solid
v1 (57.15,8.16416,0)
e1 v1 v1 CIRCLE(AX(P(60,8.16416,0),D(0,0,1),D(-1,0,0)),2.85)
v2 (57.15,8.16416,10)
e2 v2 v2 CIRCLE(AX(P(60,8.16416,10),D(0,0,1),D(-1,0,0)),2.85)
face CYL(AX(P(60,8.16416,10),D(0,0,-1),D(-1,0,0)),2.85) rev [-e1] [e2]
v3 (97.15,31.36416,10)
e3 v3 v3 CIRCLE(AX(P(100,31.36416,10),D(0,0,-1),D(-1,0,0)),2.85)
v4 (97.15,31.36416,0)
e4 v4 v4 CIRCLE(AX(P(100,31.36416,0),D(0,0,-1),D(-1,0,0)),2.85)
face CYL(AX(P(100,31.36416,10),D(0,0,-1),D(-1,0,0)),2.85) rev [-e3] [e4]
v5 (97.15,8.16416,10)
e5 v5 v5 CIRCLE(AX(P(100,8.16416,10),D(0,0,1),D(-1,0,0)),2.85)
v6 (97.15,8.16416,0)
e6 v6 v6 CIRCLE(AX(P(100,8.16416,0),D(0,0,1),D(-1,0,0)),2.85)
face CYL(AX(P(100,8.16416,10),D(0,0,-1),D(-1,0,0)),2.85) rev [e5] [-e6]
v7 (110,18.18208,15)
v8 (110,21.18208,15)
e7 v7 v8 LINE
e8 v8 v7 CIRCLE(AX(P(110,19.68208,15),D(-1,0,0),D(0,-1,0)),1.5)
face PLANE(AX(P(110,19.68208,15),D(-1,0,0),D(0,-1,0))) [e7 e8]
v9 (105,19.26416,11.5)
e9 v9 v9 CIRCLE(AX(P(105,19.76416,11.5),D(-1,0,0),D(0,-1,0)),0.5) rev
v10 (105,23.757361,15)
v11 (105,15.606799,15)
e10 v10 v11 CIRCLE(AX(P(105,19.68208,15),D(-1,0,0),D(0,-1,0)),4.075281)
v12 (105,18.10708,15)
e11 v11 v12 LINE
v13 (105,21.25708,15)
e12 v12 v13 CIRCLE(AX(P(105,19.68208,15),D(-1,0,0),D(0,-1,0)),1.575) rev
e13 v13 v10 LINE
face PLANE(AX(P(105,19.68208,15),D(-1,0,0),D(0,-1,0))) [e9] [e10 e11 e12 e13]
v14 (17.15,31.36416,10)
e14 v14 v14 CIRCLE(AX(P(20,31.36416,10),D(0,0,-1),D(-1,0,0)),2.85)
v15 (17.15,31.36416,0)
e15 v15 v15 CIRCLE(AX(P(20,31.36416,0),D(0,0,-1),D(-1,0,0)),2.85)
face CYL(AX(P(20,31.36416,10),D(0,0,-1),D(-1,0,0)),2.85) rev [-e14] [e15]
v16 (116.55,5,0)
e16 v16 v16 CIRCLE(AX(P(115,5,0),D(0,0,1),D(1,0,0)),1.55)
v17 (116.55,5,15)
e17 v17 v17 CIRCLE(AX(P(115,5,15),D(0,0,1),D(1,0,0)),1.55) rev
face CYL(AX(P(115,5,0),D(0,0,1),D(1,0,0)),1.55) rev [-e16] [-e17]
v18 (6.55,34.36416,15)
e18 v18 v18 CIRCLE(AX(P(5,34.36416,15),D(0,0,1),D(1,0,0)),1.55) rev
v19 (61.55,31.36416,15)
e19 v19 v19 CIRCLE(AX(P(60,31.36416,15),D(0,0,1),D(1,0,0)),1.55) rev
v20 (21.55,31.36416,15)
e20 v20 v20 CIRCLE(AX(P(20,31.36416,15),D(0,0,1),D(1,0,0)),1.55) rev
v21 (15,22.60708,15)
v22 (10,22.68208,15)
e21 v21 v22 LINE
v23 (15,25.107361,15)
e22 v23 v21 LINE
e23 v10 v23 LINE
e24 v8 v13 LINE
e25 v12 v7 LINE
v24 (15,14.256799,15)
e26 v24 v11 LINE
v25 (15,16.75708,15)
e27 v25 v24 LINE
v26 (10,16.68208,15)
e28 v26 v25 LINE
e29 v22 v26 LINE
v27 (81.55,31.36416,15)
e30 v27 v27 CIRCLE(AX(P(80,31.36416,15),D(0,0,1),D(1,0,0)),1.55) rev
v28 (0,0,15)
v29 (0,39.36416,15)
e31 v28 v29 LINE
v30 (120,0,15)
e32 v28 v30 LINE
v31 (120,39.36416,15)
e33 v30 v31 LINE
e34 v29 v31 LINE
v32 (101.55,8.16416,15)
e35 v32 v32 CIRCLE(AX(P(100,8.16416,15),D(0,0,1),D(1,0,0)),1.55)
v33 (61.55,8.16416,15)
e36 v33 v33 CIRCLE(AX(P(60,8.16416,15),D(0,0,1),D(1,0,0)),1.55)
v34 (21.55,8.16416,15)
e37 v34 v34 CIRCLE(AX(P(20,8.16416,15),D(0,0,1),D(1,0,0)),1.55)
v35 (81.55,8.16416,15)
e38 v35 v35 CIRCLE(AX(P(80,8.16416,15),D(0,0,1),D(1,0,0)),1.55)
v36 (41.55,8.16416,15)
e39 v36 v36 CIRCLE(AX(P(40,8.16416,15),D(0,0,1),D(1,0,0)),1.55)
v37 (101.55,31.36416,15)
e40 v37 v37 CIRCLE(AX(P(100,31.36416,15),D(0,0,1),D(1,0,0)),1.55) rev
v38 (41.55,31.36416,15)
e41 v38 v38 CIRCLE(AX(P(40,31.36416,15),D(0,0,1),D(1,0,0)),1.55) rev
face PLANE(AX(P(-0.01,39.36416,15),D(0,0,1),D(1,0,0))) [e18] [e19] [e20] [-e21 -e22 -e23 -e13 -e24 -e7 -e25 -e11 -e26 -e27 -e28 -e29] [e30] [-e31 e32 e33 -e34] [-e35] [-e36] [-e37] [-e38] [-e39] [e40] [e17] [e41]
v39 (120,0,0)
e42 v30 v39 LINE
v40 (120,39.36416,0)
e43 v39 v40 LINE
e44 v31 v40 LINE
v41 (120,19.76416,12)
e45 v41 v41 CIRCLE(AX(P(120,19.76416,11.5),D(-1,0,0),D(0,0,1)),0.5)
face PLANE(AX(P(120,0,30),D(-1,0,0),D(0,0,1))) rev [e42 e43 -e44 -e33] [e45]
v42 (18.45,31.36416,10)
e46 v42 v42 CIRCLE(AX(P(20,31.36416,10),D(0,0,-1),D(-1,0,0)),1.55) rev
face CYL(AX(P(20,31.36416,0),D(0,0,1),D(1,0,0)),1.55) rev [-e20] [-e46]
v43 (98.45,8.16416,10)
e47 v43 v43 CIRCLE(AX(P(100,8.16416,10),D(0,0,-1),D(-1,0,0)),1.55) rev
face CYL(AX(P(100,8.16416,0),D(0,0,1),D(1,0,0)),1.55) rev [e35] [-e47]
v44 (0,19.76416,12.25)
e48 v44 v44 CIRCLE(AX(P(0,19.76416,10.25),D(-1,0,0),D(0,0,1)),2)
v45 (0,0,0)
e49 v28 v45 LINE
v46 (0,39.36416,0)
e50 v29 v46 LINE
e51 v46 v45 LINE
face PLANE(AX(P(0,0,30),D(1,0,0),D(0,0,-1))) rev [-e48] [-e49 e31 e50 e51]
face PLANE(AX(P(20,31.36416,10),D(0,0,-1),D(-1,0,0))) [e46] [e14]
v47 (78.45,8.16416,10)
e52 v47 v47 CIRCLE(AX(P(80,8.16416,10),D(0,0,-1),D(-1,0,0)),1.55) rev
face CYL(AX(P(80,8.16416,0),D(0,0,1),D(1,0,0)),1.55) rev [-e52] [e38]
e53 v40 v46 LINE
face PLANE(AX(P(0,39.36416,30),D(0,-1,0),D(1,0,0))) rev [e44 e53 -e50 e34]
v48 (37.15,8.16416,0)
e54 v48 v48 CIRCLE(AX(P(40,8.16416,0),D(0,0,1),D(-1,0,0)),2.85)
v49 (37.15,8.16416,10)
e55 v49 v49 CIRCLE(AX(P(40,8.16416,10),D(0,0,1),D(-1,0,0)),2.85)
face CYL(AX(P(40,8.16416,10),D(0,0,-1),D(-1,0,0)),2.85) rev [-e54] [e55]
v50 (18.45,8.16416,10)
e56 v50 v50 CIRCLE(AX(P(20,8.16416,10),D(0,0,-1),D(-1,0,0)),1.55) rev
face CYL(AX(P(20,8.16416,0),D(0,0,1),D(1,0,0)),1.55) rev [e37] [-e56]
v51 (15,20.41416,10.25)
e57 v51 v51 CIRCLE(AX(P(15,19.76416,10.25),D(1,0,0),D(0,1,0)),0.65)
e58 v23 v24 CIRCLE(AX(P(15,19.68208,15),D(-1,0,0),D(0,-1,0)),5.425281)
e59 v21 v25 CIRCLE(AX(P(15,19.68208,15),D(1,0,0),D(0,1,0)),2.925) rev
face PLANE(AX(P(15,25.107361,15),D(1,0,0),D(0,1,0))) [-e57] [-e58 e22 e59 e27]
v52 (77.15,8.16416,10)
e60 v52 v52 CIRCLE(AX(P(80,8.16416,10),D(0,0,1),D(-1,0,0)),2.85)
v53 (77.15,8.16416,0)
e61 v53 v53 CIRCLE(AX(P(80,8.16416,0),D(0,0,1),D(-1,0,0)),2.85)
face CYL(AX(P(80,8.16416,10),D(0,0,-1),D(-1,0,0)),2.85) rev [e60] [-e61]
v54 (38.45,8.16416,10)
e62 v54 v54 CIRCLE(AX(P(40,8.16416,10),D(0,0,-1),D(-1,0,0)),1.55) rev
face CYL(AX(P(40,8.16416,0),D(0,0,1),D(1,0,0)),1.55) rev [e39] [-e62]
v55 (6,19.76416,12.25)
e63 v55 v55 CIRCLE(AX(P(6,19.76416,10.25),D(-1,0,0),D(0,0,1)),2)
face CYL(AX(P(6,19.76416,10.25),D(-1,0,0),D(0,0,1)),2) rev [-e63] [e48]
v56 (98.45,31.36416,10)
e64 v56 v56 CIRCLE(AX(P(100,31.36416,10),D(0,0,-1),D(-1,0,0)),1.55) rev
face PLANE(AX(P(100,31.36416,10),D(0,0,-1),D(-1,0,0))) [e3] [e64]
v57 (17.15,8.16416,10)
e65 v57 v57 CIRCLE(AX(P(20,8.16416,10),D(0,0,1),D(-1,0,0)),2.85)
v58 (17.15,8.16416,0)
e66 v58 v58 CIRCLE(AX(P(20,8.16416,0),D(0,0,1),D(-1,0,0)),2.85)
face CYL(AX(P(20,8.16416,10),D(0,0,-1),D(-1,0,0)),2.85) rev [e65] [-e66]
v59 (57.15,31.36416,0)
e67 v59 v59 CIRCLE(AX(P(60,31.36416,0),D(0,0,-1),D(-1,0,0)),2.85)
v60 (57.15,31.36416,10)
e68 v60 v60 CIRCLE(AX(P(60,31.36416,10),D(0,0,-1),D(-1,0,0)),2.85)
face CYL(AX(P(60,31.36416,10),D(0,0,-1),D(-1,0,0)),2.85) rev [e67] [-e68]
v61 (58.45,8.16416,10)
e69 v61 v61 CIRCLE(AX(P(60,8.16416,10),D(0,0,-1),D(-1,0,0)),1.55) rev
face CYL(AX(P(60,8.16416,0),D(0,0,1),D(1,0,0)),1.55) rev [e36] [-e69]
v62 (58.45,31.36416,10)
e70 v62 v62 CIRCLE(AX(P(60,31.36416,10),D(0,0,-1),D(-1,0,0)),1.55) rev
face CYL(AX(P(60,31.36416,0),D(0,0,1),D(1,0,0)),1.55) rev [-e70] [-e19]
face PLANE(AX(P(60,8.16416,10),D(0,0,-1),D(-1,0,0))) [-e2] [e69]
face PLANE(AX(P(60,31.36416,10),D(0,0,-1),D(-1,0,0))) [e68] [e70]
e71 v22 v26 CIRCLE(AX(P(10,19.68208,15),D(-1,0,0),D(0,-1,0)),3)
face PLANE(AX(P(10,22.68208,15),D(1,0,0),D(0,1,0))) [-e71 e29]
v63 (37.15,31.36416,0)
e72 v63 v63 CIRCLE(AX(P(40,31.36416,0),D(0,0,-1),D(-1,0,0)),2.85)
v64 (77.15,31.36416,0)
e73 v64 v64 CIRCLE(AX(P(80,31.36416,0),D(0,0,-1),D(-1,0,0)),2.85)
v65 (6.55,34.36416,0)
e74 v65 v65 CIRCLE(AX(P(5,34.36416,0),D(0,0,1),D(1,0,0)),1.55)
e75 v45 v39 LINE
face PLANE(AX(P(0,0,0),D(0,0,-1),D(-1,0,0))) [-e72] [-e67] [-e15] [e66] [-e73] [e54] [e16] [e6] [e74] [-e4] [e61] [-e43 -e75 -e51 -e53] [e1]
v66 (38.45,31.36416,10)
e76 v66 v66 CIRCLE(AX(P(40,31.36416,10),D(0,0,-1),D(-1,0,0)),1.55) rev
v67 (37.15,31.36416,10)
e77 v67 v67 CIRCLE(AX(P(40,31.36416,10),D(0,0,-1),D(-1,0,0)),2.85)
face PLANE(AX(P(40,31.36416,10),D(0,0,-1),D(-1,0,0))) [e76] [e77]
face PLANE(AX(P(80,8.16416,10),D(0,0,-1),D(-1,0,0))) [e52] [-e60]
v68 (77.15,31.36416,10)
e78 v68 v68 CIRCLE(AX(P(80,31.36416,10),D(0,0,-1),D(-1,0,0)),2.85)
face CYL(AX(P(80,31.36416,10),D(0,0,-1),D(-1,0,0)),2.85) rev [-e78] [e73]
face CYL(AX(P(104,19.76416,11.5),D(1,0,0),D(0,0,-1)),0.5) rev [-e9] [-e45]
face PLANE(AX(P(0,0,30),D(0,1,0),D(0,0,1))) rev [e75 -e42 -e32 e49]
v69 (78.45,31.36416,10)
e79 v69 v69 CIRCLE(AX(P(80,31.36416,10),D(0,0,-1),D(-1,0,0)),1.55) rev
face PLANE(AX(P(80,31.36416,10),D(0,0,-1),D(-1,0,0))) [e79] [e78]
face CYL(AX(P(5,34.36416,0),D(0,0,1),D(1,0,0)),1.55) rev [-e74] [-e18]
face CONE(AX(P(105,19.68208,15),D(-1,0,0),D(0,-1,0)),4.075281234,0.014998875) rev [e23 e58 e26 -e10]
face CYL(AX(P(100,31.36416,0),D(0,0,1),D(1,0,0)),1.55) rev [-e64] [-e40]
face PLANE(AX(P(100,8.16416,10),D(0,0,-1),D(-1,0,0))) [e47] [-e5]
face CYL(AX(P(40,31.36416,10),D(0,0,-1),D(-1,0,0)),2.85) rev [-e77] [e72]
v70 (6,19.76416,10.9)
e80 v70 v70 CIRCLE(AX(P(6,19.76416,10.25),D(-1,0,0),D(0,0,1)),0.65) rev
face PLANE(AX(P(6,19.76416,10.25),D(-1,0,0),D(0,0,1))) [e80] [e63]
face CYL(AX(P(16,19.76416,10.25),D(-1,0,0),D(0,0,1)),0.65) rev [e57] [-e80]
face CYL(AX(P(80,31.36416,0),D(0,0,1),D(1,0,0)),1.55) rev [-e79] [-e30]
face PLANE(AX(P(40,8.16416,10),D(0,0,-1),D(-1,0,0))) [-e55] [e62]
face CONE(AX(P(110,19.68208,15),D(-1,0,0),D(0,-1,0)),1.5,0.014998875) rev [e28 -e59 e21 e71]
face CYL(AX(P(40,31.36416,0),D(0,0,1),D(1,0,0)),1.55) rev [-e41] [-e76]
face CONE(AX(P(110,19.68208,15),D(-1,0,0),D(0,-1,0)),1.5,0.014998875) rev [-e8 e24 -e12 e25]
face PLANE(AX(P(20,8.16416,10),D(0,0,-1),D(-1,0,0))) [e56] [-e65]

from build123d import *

# Parameters (mm, degrees)
SKIZZE2_W                        = 120
SKIZZE2_H                        = 39.364160046
AUFSATZ_LINEAR_AUSTRAGEN1_DEPTH  = 30
SKIZZE24_R                       = 1.55
SCHNITT_LINEAR_AUSTRAGEN4_DEPTH  = 130.805766806
SKIZZE46_R                       = 2.85
SCHNITT_LINEAR_AUSTRAGEN15_DEPTH = 10
SCHNITT_LINEAR_START             = -5
SCHNITT_LINEAR_AUSTRAGEN25_DEPTH = 2.7
LINEARES_MUSTER1_COUNT           = 5
LINEARES_MUSTER1_PITCH           = 20
SPIEGELN2_COPY_1_SKETCH_R        = 2.85
SPIEGELN2_COPY_1_DEPTH           = 10
SPIEGELN2_COPY_2_SKETCH_R        = 2.85
SPIEGELN2_COPY_2_DEPTH           = 10
SPIEGELN2_COPY_3_SKETCH_R        = 2.85
SPIEGELN2_COPY_3_DEPTH           = 10
SPIEGELN2_COPY_4_SKETCH_R        = 2.85
SPIEGELN2_COPY_4_DEPTH           = 10
SPIEGELN2_START                  = -5
SPIEGELN2_COPY_5_DEPTH           = 2.7
SPIEGELN2_COPY_6_DEPTH           = 2.7
SPIEGELN2_COPY_7_DEPTH           = 2.7
SPIEGELN2_COPY_8_DEPTH           = 2.7
SKIZZE51_R                       = 1.55
SCHNITT_LINEAR_AUSTRAGEN26_DEPTH = 130.805766806
SKIZZE67_R                       = 0.5
SCHNITT_LINEAR_AUSTRAGEN28_DEPTH = 16
SKIZZE68_R                       = 0.65
SCHNITT_LINEAR_AUSTRAGEN30_DEPTH = 16
SKIZZE70_R                       = 2
SCHNITT_LINEAR_AUSTRAGEN31_DEPTH = 6
ABSPALTEN3_START                 = 15
ABSPALTEN3_OUTLINE_W             = 120
ABSPALTEN3_OUTLINE_H             = 39.364160046
ABSPALTEN3_OUTLINE_R             = 1.55
ABSPALTEN3_DEPTH                 = 15


# Read off the part's stored shape, not the designer's step: Abspalten3
with BuildPart() as part:
    # Skizze2 → Aufsatz-Linear austragen1 (new body)
    with BuildSketch(Plane.XY):
        with Locations((60, 19.682080023)):
            Rectangle(SKIZZE2_W, SKIZZE2_H)
    extrude(amount=AUFSATZ_LINEAR_AUSTRAGEN1_DEPTH)

    # Skizze24 → Schnitt-Linear austragen4 (cut, through all)
    with BuildSketch(Plane.XY.offset(30)):
        with Locations((20, 31.364160046)):
            Circle(SKIZZE24_R)
        with Locations((40, 31.364160046)):
            Circle(SKIZZE24_R)
        with Locations((60, 31.364160046)):
            Circle(SKIZZE24_R)
        with Locations((80, 31.364160046)):
            Circle(SKIZZE24_R)
        with Locations((100, 31.364160046)):
            Circle(SKIZZE24_R)
    schnitt_linear_austragen4 = extrude(amount=-SCHNITT_LINEAR_AUSTRAGEN4_DEPTH, mode=Mode.SUBTRACT)

    # Skizze46 → Schnitt-Linear austragen15 (cut)
    with BuildSketch(Plane(origin=(0, 0, 0), x_dir=(-1, 0, 0), z_dir=(0, 0, -1))):
        with Locations((-100, 31.364160046)):
            Circle(SKIZZE46_R)
    schnitt_linear_austragen15 = extrude(amount=-SCHNITT_LINEAR_AUSTRAGEN15_DEPTH, mode=Mode.SUBTRACT)

    # Skizze50 → Schnitt-Linear austragen25 (cut)
    with BuildSketch(Plane.XY.offset(30).offset(SCHNITT_LINEAR_START)):
        Polygon((97.15, 33.009608314), (97.15, 39.364160046), (102.85, 39.364160046), (102.85, 33.009608314), (102.85, 29.718711779), (100, 28.073263512), (97.15, 29.718711779), align=None)
    schnitt_linear_austragen25 = extrude(amount=-SCHNITT_LINEAR_AUSTRAGEN25_DEPTH, mode=Mode.SUBTRACT)

    # Lineares Muster1: Schnitt-Linear austragen15, Schnitt-Linear austragen25 ×5
    with Locations(*[(-i * LINEARES_MUSTER1_PITCH, 0, 0) for i in range(1, LINEARES_MUSTER1_COUNT)]):
        add(schnitt_linear_austragen15, mode=Mode.SUBTRACT)
        add(schnitt_linear_austragen25, mode=Mode.SUBTRACT)

    # Spiegeln2: Schnitt-Linear austragen15, Schnitt-Linear austragen25 across plane
    add(schnitt_linear_austragen15.mirror(Plane.ZX.offset(19.764160046)), mode=Mode.SUBTRACT)
    add(schnitt_linear_austragen25.mirror(Plane.ZX.offset(19.764160046)), mode=Mode.SUBTRACT)

    # Spiegeln2 copy 1 sketch → Spiegeln2 copy 1 (cut)
    with BuildSketch(Plane(origin=(-20, 39.528320093, 0), x_dir=(-1, 0, 0), z_dir=(0, 0, -1))):
        with Locations((-100, -31.364160046)):
            Circle(SPIEGELN2_COPY_1_SKETCH_R)
    extrude(amount=-SPIEGELN2_COPY_1_DEPTH, mode=Mode.SUBTRACT)

    # Spiegeln2 copy 2 sketch → Spiegeln2 copy 2 (cut)
    with BuildSketch(Plane(origin=(-40, 39.528320093, 0), x_dir=(-1, 0, 0), z_dir=(0, 0, -1))):
        with Locations((-100, -31.364160046)):
            Circle(SPIEGELN2_COPY_2_SKETCH_R)
    extrude(amount=-SPIEGELN2_COPY_2_DEPTH, mode=Mode.SUBTRACT)

    # Spiegeln2 copy 3 sketch → Spiegeln2 copy 3 (cut)
    with BuildSketch(Plane(origin=(-60, 39.528320093, 0), x_dir=(-1, 0, 0), z_dir=(0, 0, -1))):
        with Locations((-100, -31.364160046)):
            Circle(SPIEGELN2_COPY_3_SKETCH_R)
    extrude(amount=-SPIEGELN2_COPY_3_DEPTH, mode=Mode.SUBTRACT)

    # Spiegeln2 copy 4 sketch → Spiegeln2 copy 4 (cut)
    with BuildSketch(Plane(origin=(-80, 39.528320093, 0), x_dir=(-1, 0, 0), z_dir=(0, 0, -1))):
        with Locations((-100, -31.364160046)):
            Circle(SPIEGELN2_COPY_4_SKETCH_R)
    extrude(amount=-SPIEGELN2_COPY_4_DEPTH, mode=Mode.SUBTRACT)

    # Spiegeln2 copy 5 sketch → Spiegeln2 copy 5 (cut)
    with BuildSketch(Plane(origin=(-20, 39.528320093, 30), x_dir=(1, 0, 0), z_dir=(0, 0, 1)).offset(SPIEGELN2_START)):
        Polygon((97.15, -33.009608314), (97.15, -39.364160046), (102.85, -39.364160046), (102.85, -33.009608314), (102.85, -29.718711779), (100, -28.073263512), (97.15, -29.718711779), align=None)
    extrude(amount=-SPIEGELN2_COPY_5_DEPTH, mode=Mode.SUBTRACT)

    # Spiegeln2 copy 6 sketch → Spiegeln2 copy 6 (cut)
    with BuildSketch(Plane(origin=(-40, 39.528320093, 30), x_dir=(1, 0, 0), z_dir=(0, 0, 1)).offset(SPIEGELN2_START)):
        Polygon((97.15, -33.009608314), (97.15, -39.364160046), (102.85, -39.364160046), (102.85, -33.009608314), (102.85, -29.718711779), (100, -28.073263512), (97.15, -29.718711779), align=None)
    extrude(amount=-SPIEGELN2_COPY_6_DEPTH, mode=Mode.SUBTRACT)

    # Spiegeln2 copy 7 sketch → Spiegeln2 copy 7 (cut)
    with BuildSketch(Plane(origin=(-60, 39.528320093, 30), x_dir=(1, 0, 0), z_dir=(0, 0, 1)).offset(SPIEGELN2_START)):
        Polygon((97.15, -33.009608314), (97.15, -39.364160046), (102.85, -39.364160046), (102.85, -33.009608314), (102.85, -29.718711779), (100, -28.073263512), (97.15, -29.718711779), align=None)
    extrude(amount=-SPIEGELN2_COPY_7_DEPTH, mode=Mode.SUBTRACT)

    # Spiegeln2 copy 8 sketch → Spiegeln2 copy 8 (cut)
    with BuildSketch(Plane(origin=(-80, 39.528320093, 30), x_dir=(1, 0, 0), z_dir=(0, 0, 1)).offset(SPIEGELN2_START)):
        Polygon((97.15, -33.009608314), (97.15, -39.364160046), (102.85, -39.364160046), (102.85, -33.009608314), (102.85, -29.718711779), (100, -28.073263512), (97.15, -29.718711779), align=None)
    extrude(amount=-SPIEGELN2_COPY_8_DEPTH, mode=Mode.SUBTRACT)

    # Spiegeln3: Schnitt-Linear austragen4 across plane
    add(schnitt_linear_austragen4.mirror(Plane.ZX.offset(19.764160046)), mode=Mode.SUBTRACT)

    # Skizze51 → Schnitt-Linear austragen26 (cut, through all)
    with BuildSketch(Plane.XY.offset(30)):
        with Locations((5, 34.364160046)):
            Circle(SKIZZE51_R)
        with Locations((115, 5)):
            Circle(SKIZZE51_R)
    extrude(amount=-SCHNITT_LINEAR_AUSTRAGEN26_DEPTH, mode=Mode.SUBTRACT)

    # Skizze66 → Schnitt-Rotation5 (revolve, cut)
    with BuildSketch(Plane.XY.offset(15), mode=Mode.PRIVATE) as schnitt_rotation5_sk:
        Polygon((110, 19.682080023), (110, 21.182080023), (10, 22.682080023), (10, 19.682080023), align=None)
        Polygon((105, 19.682080023), (105, 23.757361257), (15, 25.107361257), (15, 19.682080023), align=None)
    revolve(schnitt_rotation5_sk.sketch.rotate(Axis((10, 19.682080023, 15), (1, 0, 0)), 180), axis=Axis((10, 19.682080023, 15), (1, 0, 0)), mode=Mode.SUBTRACT)

    # Skizze67 → Schnitt-Linear austragen28 (cut)
    with BuildSketch(Plane(origin=(120, 0, 0), x_dir=(0, 0, -1), z_dir=(1, 0, 0))):
        with Locations((-18.5, 19.764160046)):
            Circle(SKIZZE67_R)
    schnitt_linear_austragen28 = extrude(amount=-SCHNITT_LINEAR_AUSTRAGEN28_DEPTH, mode=Mode.SUBTRACT)

    # Spiegeln5: Schnitt-Linear austragen28 across plane
    add(schnitt_linear_austragen28.mirror(Plane.XY.offset(15)), mode=Mode.SUBTRACT)

    # Skizze68 → Schnitt-Linear austragen30 (cut)
    with BuildSketch(Plane.ZY):
        with Locations((10.25, 19.764160046)):
            Circle(SKIZZE68_R)
    extrude(amount=-SCHNITT_LINEAR_AUSTRAGEN30_DEPTH, mode=Mode.SUBTRACT)

    # Skizze70 → Schnitt-Linear austragen31 (cut)
    with BuildSketch(Plane.ZY):
        with Locations((10.25, 19.764160046)):
            Circle(SKIZZE70_R)
    extrude(amount=-SCHNITT_LINEAR_AUSTRAGEN31_DEPTH, mode=Mode.SUBTRACT)

    # Abspalten3 outline → Abspalten3 (cut)
    with BuildSketch(Plane.XY.offset(ABSPALTEN3_START)):
        with Locations((60, 19.682080023)):
            Rectangle(ABSPALTEN3_OUTLINE_W, ABSPALTEN3_OUTLINE_H)
        with Locations((115, 5)):
            Circle(ABSPALTEN3_OUTLINE_R, mode=Mode.SUBTRACT)
        with Locations((5, 34.364160046)):
            Circle(ABSPALTEN3_OUTLINE_R, mode=Mode.SUBTRACT)
        with Locations((20, 31.364160046)):
            Circle(ABSPALTEN3_OUTLINE_R, mode=Mode.SUBTRACT)
        with Locations((40, 31.364160046)):
            Circle(ABSPALTEN3_OUTLINE_R, mode=Mode.SUBTRACT)
        with Locations((60, 31.364160046)):
            Circle(ABSPALTEN3_OUTLINE_R, mode=Mode.SUBTRACT)
        with Locations((80, 31.364160046)):
            Circle(ABSPALTEN3_OUTLINE_R, mode=Mode.SUBTRACT)
        with Locations((100, 31.364160046)):
            Circle(ABSPALTEN3_OUTLINE_R, mode=Mode.SUBTRACT)
        with Locations((20, 8.164160046)):
            Circle(ABSPALTEN3_OUTLINE_R, mode=Mode.SUBTRACT)
        with Locations((40, 8.164160046)):
            Circle(ABSPALTEN3_OUTLINE_R, mode=Mode.SUBTRACT)
        with Locations((60, 8.164160046)):
            Circle(ABSPALTEN3_OUTLINE_R, mode=Mode.SUBTRACT)
        with Locations((80, 8.164160046)):
            Circle(ABSPALTEN3_OUTLINE_R, mode=Mode.SUBTRACT)
        with Locations((100, 8.164160046)):
            Circle(ABSPALTEN3_OUTLINE_R, mode=Mode.SUBTRACT)
    extrude(amount=ABSPALTEN3_DEPTH, mode=Mode.SUBTRACT)


solid = part.part
